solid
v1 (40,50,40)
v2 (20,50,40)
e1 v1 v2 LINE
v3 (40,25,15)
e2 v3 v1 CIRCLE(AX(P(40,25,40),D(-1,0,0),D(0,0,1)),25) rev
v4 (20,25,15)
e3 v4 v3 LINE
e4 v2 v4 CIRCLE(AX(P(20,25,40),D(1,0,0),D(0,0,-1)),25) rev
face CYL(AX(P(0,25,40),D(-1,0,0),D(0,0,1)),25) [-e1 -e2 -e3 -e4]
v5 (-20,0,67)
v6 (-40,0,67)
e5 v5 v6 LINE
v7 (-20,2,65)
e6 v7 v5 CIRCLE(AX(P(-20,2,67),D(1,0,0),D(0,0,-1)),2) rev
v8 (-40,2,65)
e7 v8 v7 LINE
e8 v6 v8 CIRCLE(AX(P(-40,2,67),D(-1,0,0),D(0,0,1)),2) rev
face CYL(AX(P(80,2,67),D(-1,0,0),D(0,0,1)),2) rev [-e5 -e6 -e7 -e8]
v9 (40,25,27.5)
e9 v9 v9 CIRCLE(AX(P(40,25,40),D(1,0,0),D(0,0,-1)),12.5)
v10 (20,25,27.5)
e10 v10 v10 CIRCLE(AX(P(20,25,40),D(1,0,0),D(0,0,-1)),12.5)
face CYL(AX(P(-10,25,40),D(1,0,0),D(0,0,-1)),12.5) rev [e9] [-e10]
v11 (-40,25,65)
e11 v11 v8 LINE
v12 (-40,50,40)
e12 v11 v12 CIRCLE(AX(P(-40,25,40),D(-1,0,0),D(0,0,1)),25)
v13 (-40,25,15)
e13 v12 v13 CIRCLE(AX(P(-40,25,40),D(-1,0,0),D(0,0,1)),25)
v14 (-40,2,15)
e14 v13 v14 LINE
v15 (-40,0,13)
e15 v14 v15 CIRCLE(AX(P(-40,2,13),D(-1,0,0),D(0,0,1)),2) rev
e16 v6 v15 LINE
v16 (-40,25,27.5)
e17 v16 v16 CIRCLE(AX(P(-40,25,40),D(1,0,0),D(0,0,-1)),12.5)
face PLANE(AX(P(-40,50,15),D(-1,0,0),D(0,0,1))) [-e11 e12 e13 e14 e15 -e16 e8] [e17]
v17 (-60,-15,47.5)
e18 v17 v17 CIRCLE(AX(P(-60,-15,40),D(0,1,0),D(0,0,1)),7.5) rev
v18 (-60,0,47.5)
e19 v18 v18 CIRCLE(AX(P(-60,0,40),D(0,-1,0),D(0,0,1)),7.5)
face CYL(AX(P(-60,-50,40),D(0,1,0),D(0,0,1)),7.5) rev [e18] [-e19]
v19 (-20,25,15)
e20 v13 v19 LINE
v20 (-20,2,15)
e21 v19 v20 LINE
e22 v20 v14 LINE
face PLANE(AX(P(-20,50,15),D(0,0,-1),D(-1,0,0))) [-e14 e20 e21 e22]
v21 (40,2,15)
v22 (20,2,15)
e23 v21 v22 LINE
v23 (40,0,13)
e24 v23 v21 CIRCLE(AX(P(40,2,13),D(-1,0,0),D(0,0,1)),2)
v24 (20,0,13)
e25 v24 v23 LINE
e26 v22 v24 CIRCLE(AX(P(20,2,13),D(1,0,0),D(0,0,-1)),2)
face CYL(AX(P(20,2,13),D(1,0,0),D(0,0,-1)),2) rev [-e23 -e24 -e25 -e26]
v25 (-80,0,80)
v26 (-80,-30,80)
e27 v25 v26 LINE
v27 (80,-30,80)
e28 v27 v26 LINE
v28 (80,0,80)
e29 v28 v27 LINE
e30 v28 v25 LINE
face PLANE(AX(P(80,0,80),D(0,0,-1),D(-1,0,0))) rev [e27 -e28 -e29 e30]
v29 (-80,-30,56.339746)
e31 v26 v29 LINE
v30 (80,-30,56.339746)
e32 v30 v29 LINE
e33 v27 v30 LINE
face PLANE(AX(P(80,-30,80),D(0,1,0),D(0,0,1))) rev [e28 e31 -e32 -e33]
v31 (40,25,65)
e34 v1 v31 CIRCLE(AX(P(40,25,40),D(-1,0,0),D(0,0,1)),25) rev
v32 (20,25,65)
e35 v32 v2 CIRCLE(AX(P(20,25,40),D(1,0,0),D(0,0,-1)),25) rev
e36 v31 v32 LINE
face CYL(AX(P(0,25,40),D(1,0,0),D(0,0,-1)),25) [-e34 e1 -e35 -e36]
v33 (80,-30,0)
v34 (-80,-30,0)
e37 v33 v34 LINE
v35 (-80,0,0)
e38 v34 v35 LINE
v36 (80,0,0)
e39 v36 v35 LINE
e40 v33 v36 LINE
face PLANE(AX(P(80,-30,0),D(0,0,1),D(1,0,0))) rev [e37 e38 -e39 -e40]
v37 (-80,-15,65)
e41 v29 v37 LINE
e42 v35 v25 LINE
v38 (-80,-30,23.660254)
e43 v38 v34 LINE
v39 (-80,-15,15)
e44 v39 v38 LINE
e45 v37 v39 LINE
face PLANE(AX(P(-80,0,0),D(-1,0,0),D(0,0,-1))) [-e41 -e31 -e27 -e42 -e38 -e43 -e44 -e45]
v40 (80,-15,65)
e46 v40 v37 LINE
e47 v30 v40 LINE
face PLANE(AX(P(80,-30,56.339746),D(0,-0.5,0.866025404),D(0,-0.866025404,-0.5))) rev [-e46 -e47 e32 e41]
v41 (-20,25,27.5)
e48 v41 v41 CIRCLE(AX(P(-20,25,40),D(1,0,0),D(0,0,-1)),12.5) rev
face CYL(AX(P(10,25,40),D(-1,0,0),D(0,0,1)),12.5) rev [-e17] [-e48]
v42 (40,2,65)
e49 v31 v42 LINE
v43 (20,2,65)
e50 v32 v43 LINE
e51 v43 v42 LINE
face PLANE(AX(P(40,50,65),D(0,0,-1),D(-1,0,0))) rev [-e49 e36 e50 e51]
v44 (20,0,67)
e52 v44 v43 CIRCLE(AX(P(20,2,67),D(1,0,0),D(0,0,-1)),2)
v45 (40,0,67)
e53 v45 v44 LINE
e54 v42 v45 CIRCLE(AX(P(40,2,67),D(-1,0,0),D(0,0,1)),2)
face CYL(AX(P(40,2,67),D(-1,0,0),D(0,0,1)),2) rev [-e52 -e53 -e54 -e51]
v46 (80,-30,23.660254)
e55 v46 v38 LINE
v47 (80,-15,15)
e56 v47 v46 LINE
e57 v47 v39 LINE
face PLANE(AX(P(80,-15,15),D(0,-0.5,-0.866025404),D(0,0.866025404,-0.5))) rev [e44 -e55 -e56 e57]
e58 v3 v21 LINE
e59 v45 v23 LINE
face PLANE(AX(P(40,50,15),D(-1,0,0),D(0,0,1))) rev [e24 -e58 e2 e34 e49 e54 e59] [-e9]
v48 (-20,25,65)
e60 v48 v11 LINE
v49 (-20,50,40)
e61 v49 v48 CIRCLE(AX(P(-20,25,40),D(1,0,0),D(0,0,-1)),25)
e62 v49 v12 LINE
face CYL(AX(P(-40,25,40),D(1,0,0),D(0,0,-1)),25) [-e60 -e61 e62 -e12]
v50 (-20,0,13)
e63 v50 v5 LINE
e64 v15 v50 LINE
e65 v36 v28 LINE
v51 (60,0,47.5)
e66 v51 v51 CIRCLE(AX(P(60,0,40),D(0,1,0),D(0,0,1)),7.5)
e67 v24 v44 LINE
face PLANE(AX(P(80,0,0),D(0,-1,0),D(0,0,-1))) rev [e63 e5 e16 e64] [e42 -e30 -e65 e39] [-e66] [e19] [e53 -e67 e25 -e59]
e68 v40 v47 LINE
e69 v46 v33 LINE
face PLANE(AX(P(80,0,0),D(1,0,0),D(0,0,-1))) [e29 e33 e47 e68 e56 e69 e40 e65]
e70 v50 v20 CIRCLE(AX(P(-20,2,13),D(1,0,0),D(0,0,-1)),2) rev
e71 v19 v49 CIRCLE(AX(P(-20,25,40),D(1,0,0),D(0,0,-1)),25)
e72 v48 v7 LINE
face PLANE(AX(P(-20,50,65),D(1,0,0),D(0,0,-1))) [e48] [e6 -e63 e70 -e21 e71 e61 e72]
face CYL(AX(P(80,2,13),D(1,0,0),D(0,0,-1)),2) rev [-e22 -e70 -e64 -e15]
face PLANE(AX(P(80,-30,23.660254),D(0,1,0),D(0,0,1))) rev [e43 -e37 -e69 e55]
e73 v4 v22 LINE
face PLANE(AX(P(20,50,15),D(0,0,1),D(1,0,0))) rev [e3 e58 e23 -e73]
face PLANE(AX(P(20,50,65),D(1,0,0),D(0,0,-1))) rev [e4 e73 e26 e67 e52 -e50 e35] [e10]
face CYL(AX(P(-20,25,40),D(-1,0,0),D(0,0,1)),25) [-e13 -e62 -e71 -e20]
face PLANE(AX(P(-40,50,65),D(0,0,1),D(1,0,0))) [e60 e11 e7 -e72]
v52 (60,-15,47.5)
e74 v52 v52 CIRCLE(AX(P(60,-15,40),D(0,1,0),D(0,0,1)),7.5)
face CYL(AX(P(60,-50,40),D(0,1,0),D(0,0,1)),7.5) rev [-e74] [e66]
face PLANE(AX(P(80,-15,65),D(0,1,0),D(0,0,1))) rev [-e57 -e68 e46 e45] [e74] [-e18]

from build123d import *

# Parameters (mm, degrees)
BOSS_EXTRUDE2_DEPTH   = 80
SKETCH3_W             = 20
SKETCH3_H             = 50
BOSS_EXTRUDE3_DEPTH   = 50
FILLET3_R             = 25
SKETCH8_R             = 12.5
CUT_EXTRUDE1_DEPTH    = 50
SKETCH9_R             = 7.5
CUT_EXTRUDE3_DEPTH    = 50
FILLET4_R             = 2
FILLET5_R             = 2
FILLET3_OF_MIRROR14_R = 25
FILLET4_OF_MIRROR14_R = 2
FILLET5_OF_MIRROR14_R = 2


with BuildPart() as part:
    # Sketch1 → Boss-Extrude2 (new body)
    with BuildSketch(Plane(origin=(0, 0, 0), x_dir=(0, 0, -1), z_dir=(1, 0, 0))):
        Polygon((0, 0), (-80, 0), (-80, -30), (-56.339745962, -30), (-65, -15), (-15, -15), (-23.660254038, -30), (0, -30), align=None)
    boss_extrude2 = extrude(amount=BOSS_EXTRUDE2_DEPTH)

    # Sketch3 → Boss-Extrude3 (add)
    with BuildSketch(Plane(origin=(0, 0, 0), x_dir=(1, 0, 0), z_dir=(0, 1, 0))):
        with Locations((30, -40)):
            Rectangle(SKETCH3_W, SKETCH3_H)
    boss_extrude3 = extrude(amount=BOSS_EXTRUDE3_DEPTH)

    # Fillet3
    fillet3_edges = [part.edges().sort_by_distance(p)[0] for p in [
        (30, 50, 65),
        (30, 50, 15),
    ]]
    fillet(fillet3_edges, radius=FILLET3_R - 0.0001)  # a hair under: the kernel refuses the full size

    # Sketch8 → Cut-Extrude1 (cut)
    with BuildSketch(Plane(origin=(40, 0, 0), x_dir=(0, 0, -1), z_dir=(1, 0, 0))):
        with Locations((-40, 25)):
            Circle(SKETCH8_R)
    cut_extrude1 = extrude(amount=-CUT_EXTRUDE1_DEPTH, mode=Mode.SUBTRACT)

    # Sketch9 → Cut-Extrude3 (cut)
    with BuildSketch(Plane(origin=(0, 0, 0), x_dir=(1, 0, 0), z_dir=(0, 1, 0))):
        with Locations(Location((60, -40, 0), (0, 0, 270))):
            Circle(SKETCH9_R)
    cut_extrude3 = extrude(amount=-CUT_EXTRUDE3_DEPTH, mode=Mode.SUBTRACT)

    # Fillet4
    fillet4_edges = [part.edges().sort_by_distance(p)[0] for p in [
        (30, 0, 65),
    ]]
    fillet(fillet4_edges, radius=FILLET4_R)

    # Fillet5
    fillet5_edges = [part.edges().sort_by_distance(p)[0] for p in [
        (30, 0, 15),
    ]]
    fillet(fillet5_edges, radius=FILLET5_R)

    # Mirror14: Boss-Extrude2, Boss-Extrude3, Cut-Extrude1, Cut-Extrude3 across plane
    add(boss_extrude2.mirror(Plane(origin=(0, 0, 0), x_dir=(0, 0, 1), z_dir=(1, 0, 0))))
    add(boss_extrude3.mirror(Plane(origin=(0, 0, 0), x_dir=(0, 0, 1), z_dir=(1, 0, 0))))
    add(cut_extrude1.mirror(Plane(origin=(0, 0, 0), x_dir=(0, 0, 1), z_dir=(1, 0, 0))), mode=Mode.SUBTRACT)
    add(cut_extrude3.mirror(Plane(origin=(0, 0, 0), x_dir=(0, 0, 1), z_dir=(1, 0, 0))), mode=Mode.SUBTRACT)

    # Fillet3 of Mirror14
    fillet3_of_mirror14_edges = [part.edges().sort_by_distance(p)[0] for p in [
        (-30, 50, 65),
        (-30, 50, 15),
    ]]
    fillet(fillet3_of_mirror14_edges, radius=FILLET3_OF_MIRROR14_R - 0.0001)  # a hair under: the kernel refuses the full size

    # Fillet4 of Mirror14
    fillet4_of_mirror14_edges = [part.edges().sort_by_distance(p)[0] for p in [
        (-30, 0, 65),
    ]]
    fillet(fillet4_of_mirror14_edges, radius=FILLET4_OF_MIRROR14_R)

    # Fillet5 of Mirror14
    fillet5_of_mirror14_edges = [part.edges().sort_by_distance(p)[0] for p in [
        (-30, 0, 15),
    ]]
    fillet(fillet5_of_mirror14_edges, radius=FILLET5_OF_MIRROR14_R)


solid = part.part
